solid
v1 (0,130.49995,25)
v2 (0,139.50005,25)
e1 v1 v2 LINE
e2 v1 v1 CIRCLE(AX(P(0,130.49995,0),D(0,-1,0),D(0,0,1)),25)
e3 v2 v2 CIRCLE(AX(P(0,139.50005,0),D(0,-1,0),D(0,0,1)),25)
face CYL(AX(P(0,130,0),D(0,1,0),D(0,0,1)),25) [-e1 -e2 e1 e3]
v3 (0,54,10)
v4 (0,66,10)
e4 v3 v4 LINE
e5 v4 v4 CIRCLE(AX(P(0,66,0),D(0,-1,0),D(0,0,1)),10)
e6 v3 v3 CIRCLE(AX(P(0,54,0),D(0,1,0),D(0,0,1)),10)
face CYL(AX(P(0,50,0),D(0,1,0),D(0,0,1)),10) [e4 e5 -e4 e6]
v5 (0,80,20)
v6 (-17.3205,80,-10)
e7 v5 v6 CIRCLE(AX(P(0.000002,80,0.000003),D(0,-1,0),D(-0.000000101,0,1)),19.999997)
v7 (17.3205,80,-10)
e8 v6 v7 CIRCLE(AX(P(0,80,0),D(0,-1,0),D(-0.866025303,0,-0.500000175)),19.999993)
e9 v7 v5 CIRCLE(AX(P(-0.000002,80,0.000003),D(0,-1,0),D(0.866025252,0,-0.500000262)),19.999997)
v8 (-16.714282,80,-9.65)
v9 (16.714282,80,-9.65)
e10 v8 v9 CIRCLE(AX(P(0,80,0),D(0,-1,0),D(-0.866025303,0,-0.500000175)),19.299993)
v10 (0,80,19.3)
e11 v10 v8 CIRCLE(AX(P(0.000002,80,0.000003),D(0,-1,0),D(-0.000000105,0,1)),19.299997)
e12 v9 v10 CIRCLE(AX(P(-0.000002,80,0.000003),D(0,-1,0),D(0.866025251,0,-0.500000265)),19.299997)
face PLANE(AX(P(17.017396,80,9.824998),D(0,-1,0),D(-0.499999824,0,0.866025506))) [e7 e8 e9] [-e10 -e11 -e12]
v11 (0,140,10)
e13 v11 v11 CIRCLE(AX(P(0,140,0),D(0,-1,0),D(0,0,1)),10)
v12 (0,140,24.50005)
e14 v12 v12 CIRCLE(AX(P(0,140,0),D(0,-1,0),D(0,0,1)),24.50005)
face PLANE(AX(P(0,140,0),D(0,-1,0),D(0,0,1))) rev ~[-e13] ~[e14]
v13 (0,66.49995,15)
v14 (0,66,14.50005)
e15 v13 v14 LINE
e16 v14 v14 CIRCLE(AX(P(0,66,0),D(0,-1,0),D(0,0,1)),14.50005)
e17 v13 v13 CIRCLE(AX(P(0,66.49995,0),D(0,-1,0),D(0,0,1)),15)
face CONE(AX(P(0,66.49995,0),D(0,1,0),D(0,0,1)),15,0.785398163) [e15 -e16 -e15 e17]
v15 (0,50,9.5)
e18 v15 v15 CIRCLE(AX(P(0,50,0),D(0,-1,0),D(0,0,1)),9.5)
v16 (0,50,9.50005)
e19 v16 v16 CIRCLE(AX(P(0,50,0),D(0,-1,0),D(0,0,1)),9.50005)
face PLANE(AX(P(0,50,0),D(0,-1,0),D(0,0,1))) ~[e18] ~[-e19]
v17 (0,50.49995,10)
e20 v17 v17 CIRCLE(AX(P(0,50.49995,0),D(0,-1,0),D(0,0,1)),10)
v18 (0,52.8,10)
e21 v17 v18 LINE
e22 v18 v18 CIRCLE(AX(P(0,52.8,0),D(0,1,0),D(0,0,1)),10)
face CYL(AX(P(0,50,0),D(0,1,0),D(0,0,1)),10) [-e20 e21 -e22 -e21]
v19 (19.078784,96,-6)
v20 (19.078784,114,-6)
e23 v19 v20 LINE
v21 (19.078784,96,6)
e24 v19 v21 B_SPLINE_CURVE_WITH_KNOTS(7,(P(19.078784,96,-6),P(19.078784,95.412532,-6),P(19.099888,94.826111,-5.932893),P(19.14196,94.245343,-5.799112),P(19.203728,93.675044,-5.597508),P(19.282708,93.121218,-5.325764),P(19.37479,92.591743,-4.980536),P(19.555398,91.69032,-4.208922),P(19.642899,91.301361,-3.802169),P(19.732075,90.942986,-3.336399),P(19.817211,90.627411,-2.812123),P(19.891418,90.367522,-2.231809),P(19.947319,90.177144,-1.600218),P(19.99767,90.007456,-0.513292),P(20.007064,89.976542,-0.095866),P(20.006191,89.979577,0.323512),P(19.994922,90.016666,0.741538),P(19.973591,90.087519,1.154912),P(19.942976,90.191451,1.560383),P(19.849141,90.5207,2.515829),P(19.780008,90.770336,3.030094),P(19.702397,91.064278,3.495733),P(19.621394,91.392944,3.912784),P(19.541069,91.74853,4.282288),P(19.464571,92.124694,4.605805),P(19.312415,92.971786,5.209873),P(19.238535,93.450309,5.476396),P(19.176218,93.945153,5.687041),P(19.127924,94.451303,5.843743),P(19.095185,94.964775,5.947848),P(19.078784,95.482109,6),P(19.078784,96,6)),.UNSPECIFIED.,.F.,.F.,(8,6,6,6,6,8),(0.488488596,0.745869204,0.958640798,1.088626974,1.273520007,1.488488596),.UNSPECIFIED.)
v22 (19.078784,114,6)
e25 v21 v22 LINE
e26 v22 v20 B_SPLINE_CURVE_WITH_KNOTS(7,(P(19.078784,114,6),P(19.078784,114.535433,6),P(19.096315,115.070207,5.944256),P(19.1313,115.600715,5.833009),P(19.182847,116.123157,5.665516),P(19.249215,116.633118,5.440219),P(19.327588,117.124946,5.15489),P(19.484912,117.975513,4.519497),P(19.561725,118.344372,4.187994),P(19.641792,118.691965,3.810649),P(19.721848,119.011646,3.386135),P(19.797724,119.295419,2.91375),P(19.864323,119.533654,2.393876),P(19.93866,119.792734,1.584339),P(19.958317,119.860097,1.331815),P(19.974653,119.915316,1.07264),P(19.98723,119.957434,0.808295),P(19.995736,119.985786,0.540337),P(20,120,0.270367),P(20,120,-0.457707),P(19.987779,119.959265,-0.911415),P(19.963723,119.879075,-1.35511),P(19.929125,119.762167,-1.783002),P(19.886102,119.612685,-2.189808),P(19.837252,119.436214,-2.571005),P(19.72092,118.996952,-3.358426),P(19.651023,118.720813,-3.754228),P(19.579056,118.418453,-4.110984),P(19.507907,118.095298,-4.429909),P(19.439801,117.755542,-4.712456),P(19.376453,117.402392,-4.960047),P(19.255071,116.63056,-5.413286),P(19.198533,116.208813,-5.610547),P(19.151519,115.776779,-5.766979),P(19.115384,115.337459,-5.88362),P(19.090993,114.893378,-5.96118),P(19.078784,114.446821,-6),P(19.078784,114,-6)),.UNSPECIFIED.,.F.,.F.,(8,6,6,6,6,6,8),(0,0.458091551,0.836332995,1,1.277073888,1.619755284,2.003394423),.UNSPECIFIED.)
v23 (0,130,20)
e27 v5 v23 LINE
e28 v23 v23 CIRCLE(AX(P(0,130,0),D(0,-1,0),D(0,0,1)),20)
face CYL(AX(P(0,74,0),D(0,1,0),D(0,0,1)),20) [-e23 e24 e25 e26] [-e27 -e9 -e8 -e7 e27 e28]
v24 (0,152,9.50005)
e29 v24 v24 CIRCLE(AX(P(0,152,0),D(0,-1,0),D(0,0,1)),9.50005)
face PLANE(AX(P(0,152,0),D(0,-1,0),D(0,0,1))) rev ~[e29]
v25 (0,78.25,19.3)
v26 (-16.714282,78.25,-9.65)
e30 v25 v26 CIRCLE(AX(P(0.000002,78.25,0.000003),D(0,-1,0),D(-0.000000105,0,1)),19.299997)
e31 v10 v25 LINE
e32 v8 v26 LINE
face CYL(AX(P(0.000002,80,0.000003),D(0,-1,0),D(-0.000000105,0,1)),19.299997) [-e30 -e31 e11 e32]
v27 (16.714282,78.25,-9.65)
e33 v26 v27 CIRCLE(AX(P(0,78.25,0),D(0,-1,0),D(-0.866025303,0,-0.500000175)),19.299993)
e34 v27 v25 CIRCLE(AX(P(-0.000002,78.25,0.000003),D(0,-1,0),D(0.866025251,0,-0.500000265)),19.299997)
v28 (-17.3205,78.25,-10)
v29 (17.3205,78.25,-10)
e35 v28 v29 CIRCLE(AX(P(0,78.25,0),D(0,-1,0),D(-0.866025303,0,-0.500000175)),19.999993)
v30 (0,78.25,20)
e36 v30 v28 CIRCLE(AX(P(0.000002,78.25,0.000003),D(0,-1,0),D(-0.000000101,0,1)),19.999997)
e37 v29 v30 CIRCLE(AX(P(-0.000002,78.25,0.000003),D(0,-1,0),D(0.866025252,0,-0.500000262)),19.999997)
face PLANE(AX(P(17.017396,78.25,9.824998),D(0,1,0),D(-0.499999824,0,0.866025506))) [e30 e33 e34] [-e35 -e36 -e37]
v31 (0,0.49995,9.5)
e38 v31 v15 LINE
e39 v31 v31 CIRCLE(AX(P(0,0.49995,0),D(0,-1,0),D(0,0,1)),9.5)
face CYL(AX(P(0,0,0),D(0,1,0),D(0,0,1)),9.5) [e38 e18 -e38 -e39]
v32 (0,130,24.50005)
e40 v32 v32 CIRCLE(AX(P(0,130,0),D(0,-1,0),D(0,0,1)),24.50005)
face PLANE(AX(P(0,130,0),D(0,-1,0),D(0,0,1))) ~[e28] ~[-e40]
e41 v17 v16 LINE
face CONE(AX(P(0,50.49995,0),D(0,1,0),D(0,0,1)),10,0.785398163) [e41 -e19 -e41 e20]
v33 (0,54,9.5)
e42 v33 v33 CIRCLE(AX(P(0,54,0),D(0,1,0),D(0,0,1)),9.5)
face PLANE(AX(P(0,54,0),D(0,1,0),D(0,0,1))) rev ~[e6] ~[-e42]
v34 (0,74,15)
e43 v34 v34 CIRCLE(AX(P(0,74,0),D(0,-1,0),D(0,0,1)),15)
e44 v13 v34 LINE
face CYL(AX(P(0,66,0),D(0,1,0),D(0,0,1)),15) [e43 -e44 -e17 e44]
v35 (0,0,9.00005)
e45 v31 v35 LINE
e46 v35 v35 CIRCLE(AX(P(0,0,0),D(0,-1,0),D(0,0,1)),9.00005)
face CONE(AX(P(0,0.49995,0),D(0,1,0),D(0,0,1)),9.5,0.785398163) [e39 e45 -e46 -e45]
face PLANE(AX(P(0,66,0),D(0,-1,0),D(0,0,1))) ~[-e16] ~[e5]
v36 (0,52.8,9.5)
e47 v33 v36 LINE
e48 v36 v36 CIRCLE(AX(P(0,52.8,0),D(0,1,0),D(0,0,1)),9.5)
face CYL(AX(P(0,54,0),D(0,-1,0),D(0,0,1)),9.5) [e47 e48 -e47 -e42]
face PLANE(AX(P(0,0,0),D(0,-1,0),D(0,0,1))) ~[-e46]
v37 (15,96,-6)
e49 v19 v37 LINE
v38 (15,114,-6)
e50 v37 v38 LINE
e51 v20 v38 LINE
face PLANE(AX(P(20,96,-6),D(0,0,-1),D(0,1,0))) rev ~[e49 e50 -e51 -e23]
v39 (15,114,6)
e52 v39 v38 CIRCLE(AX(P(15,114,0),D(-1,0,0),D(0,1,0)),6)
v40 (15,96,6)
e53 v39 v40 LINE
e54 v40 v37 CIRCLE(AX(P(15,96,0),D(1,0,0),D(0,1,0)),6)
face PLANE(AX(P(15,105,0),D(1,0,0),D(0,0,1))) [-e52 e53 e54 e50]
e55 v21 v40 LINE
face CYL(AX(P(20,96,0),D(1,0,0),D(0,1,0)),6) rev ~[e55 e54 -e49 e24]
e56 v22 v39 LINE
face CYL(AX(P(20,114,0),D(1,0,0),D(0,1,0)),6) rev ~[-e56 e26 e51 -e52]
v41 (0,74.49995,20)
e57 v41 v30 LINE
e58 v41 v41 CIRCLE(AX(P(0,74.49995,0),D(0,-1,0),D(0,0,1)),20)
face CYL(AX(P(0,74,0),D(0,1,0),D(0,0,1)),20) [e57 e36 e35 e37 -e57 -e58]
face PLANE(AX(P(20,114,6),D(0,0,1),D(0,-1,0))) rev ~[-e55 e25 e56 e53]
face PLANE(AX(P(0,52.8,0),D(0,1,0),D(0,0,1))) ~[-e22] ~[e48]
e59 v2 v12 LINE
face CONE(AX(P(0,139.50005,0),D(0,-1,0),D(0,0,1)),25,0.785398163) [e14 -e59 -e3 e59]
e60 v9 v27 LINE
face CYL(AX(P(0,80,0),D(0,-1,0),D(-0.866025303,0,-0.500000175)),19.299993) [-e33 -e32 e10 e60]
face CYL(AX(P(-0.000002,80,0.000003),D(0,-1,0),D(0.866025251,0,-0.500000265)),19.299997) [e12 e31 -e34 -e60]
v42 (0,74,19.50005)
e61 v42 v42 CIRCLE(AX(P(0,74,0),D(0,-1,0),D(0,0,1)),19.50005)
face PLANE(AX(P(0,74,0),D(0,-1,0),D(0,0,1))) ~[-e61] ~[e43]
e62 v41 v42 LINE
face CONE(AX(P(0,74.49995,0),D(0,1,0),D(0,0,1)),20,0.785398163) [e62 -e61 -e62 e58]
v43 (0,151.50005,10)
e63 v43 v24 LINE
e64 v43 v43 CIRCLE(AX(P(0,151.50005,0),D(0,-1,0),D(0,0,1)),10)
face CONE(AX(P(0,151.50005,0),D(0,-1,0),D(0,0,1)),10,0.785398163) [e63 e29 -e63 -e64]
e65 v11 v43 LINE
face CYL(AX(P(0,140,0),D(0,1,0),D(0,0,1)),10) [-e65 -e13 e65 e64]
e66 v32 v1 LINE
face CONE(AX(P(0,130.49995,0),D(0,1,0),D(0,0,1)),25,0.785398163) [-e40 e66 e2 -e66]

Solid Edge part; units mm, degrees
sketch "Sketch1" plane through (0, 0, 0) normal (1, 0, 0) x (0, 1, 0)
  line L0 (0, 0) -> (0, 9.5)
  line L1 (0, 9.5) -> (50, 9.5)
  line L2 (50, 9.5) -> (50, 0)
  dimension "D1" = 9.5
  dimension "D2" = 9.5
  dimension "D3" = 50
revolve "RevolvedProtrusion1" add sketch "Sketch1" angle 360 about axis through (0, 77.0229, 0) along (0, -1, 0)
sketch "Sketch2" plane through (0, 0, 0) normal (1, 0, 0) x (0, 1, 0)
  line L0 (50, 0) -> (50, 10)
  line L1 (50, 10) -> (66, 10)
  line L2 (66, 10) -> (66, 0)
  dimension "D1" = 10
  dimension "D2" = 10
  dimension "D3" = 16
revolve "RevolvedProtrusion2" add sketch "Sketch2" angle 360 about axis through (0, 158.4797, 0) along (0, -1, 0)
sketch "Sketch3" plane through (0, 0, 0) normal (1, 0, 0) x (0, 1, 0)
  line L0 (66, 0) -> (66, 15)
  line L1 (66, 15) -> (74, 15)
  line L2 (74, 15) -> (74, 0)
  dimension "D1" = 15
  dimension "D2" = 15
  dimension "D3" = 8
revolve "RevolvedProtrusion3" add sketch "Sketch3" angle 360 about axis through (0, 252.6527, 0) along (0, -1, 0)
sketch "Sketch4" plane through (0, 0, 0) normal (1, 0, 0) x (0, 1, 0)
  line L0 (74, 0) -> (74, 20)
  line L1 (74, 20) -> (130, 20)
  line L2 (130, 20) -> (130, 0)
  dimension "D1" = 56
  dimension "D2" = 20
  dimension "D3" = 20
revolve "RevolvedProtrusion4" add sketch "Sketch4" angle 360 about axis through (0, 365.6603, 0) along (0, -1, 0)
sketch "Sketch5" plane through (0, 0, 0) normal (1, 0, 0) x (0, 1, 0)
  line L0 (130, 0) -> (130, 25)
  line L1 (130, 25) -> (140, 25)
  line L2 (140, 25) -> (140, 0)
  dimension "D1" = 25
  dimension "D2" = 25
  dimension "D3" = 10
revolve "RevolvedProtrusion5" add sketch "Sketch5" angle 360 about axis through (0, 524.9007, 0) along (0, -1, 0)
sketch "Sketch6" plane through (0, 0, 0) normal (1, 0, 0) x (0, 1, 0)
  line L0 (140, 0) -> (140, 10)
  line L1 (140, 10) -> (152, 10)
  line L2 (152, 10) -> (152, 0)
  dimension "D1" = 10
  dimension "D2" = 10
  dimension "D3" = 12
revolve "RevolvedProtrusion6" add sketch "Sketch6" angle 360 about axis through (0, 724.416, 0) along (0, -1, 0)
revolve "RevolvedProtrusion7" [suppressed]
revolve "RevolvedProtrusion8" [suppressed]
revolve "RevolvedProtrusion9" [suppressed]
revolve "RevolvedProtrusion10" [suppressed]
revolve "RevolvedProtrusion11" [suppressed]
revolve "RevolvedProtrusion12" [suppressed]
revolve "RevolvedProtrusion13" [suppressed]
revolve "RevolvedProtrusion14" [suppressed]
revolve "RevolvedProtrusion15" [suppressed]
revolve "RevolvedProtrusion16" [suppressed]
revolve "RevolvedProtrusion17" [suppressed]
revolve "RevolvedProtrusion18" [suppressed]
revolve "RevolvedProtrusion19" [suppressed]
revolve "RevolvedProtrusion20" [suppressed]
revolve "RevolvedProtrusion21" [suppressed]
revolve "RevolvedProtrusion22" [suppressed]
revolve "RevolvedProtrusion23" [suppressed]
revolve "RevolvedProtrusion24" [suppressed]
revolve "RevolvedProtrusion25" [suppressed]
sketch "Sketch7" plane through (0, 0, 0) normal (1, 0, 0) x (0, 1, 0)
  line L0 (52.8, 9.5) -> (52.8, 10)
  line L1 (52.8, 10) -> (54, 10)
  line L2 (54, 10) -> (54, 9.5)
  line L3 (54, 9.5) -> (52.8, 9.5)
  dimension "D1" = 10
  dimension "D2" = 9.5
  dimension "D3" = 52.8
  dimension "D4" = 1.2
revolve "RevolvedCutout1" cut sketch "Sketch7" angle 360 about axis through (0, -77.2219, 0) along (0, 1, 0)
revolve "RevolvedCutout2" [suppressed]
revolve "RevolvedCutout3" [suppressed]
revolve "RevolvedCutout4" [suppressed]
sketch "Sketch8" plane through (20, 0, 0) normal (1, 0, 0) x (0, 1, 0)
  line L0 (96, -6) -> (114, -6)
  arc A0 (114, 6) -> (114, -6) centre (114, 0) cw
  line L1 (114, 6) -> (96, 6)
  arc A1 (96, 6) -> (96, -6) centre (96, 0) ccw
  dimension "D1" = 12
  dimension "D2" = 90
  dimension "D3" = 30
extrude "Cutout1" cut sketch "Sketch8" against normal blind 5
extrude "Cutout2" [suppressed]
extrude "Cutout3" [suppressed]
extrude "Cutout4" [suppressed]
extrude "Cutout5" [suppressed]
extrude "Cutout6" [suppressed]
extrude "Cutout7" [suppressed]
extrude "Cutout8" [suppressed]
extrude "Cutout9" [suppressed]
extrude "Cutout10" [suppressed]
extrude "Cutout11" [suppressed]
extrude "Cutout12" [suppressed]
chamfer "Chamfer1" distance 0.5 angle 45 7 edges at (-9.5, 0, 0) (-10, 50, 0) (-15, 66, 0) (-20, 74, 0) (-25, 130, 0) (-25, 140, 0) (-10, 152, 0)
sketch "Sketch9" plane through (0, 0, 0) normal (1, 0, 0) x (0, 1, 0)
  line L0 (80, 19.3) -> (78.25, 19.3)
  line L1 (78.25, 19.3) -> (78.25, 20)
  line L2 (78.25, 20) -> (80, 20)
  line L3 (80, 20) -> (80, 19.3)
  dimension "D1" = 20
  dimension "D2" = 0.7
  dimension "D3" = 1.75
  dimension "D4" = 4.25
sketch3d "WycięciePoKrzywej_1 path"
  arc A0 (0, 74.4999, 20) -> (-17.3205, 74.4999, -10) centre (0, 74.4999, 0)
  arc A1 (-17.3205, 74.4999, -10) -> (17.3205, 74.4999, -10) centre (0, 74.4999, 0)
  arc A2 (17.3205, 74.4999, -10) -> (0, 74.4999, 20) centre (0, 74.4999, 0)
sweep "WycięciePoKrzywej_1" cut profiles "Sketch9" path "WycięciePoKrzywej_1 path"
properties material "Steel"
